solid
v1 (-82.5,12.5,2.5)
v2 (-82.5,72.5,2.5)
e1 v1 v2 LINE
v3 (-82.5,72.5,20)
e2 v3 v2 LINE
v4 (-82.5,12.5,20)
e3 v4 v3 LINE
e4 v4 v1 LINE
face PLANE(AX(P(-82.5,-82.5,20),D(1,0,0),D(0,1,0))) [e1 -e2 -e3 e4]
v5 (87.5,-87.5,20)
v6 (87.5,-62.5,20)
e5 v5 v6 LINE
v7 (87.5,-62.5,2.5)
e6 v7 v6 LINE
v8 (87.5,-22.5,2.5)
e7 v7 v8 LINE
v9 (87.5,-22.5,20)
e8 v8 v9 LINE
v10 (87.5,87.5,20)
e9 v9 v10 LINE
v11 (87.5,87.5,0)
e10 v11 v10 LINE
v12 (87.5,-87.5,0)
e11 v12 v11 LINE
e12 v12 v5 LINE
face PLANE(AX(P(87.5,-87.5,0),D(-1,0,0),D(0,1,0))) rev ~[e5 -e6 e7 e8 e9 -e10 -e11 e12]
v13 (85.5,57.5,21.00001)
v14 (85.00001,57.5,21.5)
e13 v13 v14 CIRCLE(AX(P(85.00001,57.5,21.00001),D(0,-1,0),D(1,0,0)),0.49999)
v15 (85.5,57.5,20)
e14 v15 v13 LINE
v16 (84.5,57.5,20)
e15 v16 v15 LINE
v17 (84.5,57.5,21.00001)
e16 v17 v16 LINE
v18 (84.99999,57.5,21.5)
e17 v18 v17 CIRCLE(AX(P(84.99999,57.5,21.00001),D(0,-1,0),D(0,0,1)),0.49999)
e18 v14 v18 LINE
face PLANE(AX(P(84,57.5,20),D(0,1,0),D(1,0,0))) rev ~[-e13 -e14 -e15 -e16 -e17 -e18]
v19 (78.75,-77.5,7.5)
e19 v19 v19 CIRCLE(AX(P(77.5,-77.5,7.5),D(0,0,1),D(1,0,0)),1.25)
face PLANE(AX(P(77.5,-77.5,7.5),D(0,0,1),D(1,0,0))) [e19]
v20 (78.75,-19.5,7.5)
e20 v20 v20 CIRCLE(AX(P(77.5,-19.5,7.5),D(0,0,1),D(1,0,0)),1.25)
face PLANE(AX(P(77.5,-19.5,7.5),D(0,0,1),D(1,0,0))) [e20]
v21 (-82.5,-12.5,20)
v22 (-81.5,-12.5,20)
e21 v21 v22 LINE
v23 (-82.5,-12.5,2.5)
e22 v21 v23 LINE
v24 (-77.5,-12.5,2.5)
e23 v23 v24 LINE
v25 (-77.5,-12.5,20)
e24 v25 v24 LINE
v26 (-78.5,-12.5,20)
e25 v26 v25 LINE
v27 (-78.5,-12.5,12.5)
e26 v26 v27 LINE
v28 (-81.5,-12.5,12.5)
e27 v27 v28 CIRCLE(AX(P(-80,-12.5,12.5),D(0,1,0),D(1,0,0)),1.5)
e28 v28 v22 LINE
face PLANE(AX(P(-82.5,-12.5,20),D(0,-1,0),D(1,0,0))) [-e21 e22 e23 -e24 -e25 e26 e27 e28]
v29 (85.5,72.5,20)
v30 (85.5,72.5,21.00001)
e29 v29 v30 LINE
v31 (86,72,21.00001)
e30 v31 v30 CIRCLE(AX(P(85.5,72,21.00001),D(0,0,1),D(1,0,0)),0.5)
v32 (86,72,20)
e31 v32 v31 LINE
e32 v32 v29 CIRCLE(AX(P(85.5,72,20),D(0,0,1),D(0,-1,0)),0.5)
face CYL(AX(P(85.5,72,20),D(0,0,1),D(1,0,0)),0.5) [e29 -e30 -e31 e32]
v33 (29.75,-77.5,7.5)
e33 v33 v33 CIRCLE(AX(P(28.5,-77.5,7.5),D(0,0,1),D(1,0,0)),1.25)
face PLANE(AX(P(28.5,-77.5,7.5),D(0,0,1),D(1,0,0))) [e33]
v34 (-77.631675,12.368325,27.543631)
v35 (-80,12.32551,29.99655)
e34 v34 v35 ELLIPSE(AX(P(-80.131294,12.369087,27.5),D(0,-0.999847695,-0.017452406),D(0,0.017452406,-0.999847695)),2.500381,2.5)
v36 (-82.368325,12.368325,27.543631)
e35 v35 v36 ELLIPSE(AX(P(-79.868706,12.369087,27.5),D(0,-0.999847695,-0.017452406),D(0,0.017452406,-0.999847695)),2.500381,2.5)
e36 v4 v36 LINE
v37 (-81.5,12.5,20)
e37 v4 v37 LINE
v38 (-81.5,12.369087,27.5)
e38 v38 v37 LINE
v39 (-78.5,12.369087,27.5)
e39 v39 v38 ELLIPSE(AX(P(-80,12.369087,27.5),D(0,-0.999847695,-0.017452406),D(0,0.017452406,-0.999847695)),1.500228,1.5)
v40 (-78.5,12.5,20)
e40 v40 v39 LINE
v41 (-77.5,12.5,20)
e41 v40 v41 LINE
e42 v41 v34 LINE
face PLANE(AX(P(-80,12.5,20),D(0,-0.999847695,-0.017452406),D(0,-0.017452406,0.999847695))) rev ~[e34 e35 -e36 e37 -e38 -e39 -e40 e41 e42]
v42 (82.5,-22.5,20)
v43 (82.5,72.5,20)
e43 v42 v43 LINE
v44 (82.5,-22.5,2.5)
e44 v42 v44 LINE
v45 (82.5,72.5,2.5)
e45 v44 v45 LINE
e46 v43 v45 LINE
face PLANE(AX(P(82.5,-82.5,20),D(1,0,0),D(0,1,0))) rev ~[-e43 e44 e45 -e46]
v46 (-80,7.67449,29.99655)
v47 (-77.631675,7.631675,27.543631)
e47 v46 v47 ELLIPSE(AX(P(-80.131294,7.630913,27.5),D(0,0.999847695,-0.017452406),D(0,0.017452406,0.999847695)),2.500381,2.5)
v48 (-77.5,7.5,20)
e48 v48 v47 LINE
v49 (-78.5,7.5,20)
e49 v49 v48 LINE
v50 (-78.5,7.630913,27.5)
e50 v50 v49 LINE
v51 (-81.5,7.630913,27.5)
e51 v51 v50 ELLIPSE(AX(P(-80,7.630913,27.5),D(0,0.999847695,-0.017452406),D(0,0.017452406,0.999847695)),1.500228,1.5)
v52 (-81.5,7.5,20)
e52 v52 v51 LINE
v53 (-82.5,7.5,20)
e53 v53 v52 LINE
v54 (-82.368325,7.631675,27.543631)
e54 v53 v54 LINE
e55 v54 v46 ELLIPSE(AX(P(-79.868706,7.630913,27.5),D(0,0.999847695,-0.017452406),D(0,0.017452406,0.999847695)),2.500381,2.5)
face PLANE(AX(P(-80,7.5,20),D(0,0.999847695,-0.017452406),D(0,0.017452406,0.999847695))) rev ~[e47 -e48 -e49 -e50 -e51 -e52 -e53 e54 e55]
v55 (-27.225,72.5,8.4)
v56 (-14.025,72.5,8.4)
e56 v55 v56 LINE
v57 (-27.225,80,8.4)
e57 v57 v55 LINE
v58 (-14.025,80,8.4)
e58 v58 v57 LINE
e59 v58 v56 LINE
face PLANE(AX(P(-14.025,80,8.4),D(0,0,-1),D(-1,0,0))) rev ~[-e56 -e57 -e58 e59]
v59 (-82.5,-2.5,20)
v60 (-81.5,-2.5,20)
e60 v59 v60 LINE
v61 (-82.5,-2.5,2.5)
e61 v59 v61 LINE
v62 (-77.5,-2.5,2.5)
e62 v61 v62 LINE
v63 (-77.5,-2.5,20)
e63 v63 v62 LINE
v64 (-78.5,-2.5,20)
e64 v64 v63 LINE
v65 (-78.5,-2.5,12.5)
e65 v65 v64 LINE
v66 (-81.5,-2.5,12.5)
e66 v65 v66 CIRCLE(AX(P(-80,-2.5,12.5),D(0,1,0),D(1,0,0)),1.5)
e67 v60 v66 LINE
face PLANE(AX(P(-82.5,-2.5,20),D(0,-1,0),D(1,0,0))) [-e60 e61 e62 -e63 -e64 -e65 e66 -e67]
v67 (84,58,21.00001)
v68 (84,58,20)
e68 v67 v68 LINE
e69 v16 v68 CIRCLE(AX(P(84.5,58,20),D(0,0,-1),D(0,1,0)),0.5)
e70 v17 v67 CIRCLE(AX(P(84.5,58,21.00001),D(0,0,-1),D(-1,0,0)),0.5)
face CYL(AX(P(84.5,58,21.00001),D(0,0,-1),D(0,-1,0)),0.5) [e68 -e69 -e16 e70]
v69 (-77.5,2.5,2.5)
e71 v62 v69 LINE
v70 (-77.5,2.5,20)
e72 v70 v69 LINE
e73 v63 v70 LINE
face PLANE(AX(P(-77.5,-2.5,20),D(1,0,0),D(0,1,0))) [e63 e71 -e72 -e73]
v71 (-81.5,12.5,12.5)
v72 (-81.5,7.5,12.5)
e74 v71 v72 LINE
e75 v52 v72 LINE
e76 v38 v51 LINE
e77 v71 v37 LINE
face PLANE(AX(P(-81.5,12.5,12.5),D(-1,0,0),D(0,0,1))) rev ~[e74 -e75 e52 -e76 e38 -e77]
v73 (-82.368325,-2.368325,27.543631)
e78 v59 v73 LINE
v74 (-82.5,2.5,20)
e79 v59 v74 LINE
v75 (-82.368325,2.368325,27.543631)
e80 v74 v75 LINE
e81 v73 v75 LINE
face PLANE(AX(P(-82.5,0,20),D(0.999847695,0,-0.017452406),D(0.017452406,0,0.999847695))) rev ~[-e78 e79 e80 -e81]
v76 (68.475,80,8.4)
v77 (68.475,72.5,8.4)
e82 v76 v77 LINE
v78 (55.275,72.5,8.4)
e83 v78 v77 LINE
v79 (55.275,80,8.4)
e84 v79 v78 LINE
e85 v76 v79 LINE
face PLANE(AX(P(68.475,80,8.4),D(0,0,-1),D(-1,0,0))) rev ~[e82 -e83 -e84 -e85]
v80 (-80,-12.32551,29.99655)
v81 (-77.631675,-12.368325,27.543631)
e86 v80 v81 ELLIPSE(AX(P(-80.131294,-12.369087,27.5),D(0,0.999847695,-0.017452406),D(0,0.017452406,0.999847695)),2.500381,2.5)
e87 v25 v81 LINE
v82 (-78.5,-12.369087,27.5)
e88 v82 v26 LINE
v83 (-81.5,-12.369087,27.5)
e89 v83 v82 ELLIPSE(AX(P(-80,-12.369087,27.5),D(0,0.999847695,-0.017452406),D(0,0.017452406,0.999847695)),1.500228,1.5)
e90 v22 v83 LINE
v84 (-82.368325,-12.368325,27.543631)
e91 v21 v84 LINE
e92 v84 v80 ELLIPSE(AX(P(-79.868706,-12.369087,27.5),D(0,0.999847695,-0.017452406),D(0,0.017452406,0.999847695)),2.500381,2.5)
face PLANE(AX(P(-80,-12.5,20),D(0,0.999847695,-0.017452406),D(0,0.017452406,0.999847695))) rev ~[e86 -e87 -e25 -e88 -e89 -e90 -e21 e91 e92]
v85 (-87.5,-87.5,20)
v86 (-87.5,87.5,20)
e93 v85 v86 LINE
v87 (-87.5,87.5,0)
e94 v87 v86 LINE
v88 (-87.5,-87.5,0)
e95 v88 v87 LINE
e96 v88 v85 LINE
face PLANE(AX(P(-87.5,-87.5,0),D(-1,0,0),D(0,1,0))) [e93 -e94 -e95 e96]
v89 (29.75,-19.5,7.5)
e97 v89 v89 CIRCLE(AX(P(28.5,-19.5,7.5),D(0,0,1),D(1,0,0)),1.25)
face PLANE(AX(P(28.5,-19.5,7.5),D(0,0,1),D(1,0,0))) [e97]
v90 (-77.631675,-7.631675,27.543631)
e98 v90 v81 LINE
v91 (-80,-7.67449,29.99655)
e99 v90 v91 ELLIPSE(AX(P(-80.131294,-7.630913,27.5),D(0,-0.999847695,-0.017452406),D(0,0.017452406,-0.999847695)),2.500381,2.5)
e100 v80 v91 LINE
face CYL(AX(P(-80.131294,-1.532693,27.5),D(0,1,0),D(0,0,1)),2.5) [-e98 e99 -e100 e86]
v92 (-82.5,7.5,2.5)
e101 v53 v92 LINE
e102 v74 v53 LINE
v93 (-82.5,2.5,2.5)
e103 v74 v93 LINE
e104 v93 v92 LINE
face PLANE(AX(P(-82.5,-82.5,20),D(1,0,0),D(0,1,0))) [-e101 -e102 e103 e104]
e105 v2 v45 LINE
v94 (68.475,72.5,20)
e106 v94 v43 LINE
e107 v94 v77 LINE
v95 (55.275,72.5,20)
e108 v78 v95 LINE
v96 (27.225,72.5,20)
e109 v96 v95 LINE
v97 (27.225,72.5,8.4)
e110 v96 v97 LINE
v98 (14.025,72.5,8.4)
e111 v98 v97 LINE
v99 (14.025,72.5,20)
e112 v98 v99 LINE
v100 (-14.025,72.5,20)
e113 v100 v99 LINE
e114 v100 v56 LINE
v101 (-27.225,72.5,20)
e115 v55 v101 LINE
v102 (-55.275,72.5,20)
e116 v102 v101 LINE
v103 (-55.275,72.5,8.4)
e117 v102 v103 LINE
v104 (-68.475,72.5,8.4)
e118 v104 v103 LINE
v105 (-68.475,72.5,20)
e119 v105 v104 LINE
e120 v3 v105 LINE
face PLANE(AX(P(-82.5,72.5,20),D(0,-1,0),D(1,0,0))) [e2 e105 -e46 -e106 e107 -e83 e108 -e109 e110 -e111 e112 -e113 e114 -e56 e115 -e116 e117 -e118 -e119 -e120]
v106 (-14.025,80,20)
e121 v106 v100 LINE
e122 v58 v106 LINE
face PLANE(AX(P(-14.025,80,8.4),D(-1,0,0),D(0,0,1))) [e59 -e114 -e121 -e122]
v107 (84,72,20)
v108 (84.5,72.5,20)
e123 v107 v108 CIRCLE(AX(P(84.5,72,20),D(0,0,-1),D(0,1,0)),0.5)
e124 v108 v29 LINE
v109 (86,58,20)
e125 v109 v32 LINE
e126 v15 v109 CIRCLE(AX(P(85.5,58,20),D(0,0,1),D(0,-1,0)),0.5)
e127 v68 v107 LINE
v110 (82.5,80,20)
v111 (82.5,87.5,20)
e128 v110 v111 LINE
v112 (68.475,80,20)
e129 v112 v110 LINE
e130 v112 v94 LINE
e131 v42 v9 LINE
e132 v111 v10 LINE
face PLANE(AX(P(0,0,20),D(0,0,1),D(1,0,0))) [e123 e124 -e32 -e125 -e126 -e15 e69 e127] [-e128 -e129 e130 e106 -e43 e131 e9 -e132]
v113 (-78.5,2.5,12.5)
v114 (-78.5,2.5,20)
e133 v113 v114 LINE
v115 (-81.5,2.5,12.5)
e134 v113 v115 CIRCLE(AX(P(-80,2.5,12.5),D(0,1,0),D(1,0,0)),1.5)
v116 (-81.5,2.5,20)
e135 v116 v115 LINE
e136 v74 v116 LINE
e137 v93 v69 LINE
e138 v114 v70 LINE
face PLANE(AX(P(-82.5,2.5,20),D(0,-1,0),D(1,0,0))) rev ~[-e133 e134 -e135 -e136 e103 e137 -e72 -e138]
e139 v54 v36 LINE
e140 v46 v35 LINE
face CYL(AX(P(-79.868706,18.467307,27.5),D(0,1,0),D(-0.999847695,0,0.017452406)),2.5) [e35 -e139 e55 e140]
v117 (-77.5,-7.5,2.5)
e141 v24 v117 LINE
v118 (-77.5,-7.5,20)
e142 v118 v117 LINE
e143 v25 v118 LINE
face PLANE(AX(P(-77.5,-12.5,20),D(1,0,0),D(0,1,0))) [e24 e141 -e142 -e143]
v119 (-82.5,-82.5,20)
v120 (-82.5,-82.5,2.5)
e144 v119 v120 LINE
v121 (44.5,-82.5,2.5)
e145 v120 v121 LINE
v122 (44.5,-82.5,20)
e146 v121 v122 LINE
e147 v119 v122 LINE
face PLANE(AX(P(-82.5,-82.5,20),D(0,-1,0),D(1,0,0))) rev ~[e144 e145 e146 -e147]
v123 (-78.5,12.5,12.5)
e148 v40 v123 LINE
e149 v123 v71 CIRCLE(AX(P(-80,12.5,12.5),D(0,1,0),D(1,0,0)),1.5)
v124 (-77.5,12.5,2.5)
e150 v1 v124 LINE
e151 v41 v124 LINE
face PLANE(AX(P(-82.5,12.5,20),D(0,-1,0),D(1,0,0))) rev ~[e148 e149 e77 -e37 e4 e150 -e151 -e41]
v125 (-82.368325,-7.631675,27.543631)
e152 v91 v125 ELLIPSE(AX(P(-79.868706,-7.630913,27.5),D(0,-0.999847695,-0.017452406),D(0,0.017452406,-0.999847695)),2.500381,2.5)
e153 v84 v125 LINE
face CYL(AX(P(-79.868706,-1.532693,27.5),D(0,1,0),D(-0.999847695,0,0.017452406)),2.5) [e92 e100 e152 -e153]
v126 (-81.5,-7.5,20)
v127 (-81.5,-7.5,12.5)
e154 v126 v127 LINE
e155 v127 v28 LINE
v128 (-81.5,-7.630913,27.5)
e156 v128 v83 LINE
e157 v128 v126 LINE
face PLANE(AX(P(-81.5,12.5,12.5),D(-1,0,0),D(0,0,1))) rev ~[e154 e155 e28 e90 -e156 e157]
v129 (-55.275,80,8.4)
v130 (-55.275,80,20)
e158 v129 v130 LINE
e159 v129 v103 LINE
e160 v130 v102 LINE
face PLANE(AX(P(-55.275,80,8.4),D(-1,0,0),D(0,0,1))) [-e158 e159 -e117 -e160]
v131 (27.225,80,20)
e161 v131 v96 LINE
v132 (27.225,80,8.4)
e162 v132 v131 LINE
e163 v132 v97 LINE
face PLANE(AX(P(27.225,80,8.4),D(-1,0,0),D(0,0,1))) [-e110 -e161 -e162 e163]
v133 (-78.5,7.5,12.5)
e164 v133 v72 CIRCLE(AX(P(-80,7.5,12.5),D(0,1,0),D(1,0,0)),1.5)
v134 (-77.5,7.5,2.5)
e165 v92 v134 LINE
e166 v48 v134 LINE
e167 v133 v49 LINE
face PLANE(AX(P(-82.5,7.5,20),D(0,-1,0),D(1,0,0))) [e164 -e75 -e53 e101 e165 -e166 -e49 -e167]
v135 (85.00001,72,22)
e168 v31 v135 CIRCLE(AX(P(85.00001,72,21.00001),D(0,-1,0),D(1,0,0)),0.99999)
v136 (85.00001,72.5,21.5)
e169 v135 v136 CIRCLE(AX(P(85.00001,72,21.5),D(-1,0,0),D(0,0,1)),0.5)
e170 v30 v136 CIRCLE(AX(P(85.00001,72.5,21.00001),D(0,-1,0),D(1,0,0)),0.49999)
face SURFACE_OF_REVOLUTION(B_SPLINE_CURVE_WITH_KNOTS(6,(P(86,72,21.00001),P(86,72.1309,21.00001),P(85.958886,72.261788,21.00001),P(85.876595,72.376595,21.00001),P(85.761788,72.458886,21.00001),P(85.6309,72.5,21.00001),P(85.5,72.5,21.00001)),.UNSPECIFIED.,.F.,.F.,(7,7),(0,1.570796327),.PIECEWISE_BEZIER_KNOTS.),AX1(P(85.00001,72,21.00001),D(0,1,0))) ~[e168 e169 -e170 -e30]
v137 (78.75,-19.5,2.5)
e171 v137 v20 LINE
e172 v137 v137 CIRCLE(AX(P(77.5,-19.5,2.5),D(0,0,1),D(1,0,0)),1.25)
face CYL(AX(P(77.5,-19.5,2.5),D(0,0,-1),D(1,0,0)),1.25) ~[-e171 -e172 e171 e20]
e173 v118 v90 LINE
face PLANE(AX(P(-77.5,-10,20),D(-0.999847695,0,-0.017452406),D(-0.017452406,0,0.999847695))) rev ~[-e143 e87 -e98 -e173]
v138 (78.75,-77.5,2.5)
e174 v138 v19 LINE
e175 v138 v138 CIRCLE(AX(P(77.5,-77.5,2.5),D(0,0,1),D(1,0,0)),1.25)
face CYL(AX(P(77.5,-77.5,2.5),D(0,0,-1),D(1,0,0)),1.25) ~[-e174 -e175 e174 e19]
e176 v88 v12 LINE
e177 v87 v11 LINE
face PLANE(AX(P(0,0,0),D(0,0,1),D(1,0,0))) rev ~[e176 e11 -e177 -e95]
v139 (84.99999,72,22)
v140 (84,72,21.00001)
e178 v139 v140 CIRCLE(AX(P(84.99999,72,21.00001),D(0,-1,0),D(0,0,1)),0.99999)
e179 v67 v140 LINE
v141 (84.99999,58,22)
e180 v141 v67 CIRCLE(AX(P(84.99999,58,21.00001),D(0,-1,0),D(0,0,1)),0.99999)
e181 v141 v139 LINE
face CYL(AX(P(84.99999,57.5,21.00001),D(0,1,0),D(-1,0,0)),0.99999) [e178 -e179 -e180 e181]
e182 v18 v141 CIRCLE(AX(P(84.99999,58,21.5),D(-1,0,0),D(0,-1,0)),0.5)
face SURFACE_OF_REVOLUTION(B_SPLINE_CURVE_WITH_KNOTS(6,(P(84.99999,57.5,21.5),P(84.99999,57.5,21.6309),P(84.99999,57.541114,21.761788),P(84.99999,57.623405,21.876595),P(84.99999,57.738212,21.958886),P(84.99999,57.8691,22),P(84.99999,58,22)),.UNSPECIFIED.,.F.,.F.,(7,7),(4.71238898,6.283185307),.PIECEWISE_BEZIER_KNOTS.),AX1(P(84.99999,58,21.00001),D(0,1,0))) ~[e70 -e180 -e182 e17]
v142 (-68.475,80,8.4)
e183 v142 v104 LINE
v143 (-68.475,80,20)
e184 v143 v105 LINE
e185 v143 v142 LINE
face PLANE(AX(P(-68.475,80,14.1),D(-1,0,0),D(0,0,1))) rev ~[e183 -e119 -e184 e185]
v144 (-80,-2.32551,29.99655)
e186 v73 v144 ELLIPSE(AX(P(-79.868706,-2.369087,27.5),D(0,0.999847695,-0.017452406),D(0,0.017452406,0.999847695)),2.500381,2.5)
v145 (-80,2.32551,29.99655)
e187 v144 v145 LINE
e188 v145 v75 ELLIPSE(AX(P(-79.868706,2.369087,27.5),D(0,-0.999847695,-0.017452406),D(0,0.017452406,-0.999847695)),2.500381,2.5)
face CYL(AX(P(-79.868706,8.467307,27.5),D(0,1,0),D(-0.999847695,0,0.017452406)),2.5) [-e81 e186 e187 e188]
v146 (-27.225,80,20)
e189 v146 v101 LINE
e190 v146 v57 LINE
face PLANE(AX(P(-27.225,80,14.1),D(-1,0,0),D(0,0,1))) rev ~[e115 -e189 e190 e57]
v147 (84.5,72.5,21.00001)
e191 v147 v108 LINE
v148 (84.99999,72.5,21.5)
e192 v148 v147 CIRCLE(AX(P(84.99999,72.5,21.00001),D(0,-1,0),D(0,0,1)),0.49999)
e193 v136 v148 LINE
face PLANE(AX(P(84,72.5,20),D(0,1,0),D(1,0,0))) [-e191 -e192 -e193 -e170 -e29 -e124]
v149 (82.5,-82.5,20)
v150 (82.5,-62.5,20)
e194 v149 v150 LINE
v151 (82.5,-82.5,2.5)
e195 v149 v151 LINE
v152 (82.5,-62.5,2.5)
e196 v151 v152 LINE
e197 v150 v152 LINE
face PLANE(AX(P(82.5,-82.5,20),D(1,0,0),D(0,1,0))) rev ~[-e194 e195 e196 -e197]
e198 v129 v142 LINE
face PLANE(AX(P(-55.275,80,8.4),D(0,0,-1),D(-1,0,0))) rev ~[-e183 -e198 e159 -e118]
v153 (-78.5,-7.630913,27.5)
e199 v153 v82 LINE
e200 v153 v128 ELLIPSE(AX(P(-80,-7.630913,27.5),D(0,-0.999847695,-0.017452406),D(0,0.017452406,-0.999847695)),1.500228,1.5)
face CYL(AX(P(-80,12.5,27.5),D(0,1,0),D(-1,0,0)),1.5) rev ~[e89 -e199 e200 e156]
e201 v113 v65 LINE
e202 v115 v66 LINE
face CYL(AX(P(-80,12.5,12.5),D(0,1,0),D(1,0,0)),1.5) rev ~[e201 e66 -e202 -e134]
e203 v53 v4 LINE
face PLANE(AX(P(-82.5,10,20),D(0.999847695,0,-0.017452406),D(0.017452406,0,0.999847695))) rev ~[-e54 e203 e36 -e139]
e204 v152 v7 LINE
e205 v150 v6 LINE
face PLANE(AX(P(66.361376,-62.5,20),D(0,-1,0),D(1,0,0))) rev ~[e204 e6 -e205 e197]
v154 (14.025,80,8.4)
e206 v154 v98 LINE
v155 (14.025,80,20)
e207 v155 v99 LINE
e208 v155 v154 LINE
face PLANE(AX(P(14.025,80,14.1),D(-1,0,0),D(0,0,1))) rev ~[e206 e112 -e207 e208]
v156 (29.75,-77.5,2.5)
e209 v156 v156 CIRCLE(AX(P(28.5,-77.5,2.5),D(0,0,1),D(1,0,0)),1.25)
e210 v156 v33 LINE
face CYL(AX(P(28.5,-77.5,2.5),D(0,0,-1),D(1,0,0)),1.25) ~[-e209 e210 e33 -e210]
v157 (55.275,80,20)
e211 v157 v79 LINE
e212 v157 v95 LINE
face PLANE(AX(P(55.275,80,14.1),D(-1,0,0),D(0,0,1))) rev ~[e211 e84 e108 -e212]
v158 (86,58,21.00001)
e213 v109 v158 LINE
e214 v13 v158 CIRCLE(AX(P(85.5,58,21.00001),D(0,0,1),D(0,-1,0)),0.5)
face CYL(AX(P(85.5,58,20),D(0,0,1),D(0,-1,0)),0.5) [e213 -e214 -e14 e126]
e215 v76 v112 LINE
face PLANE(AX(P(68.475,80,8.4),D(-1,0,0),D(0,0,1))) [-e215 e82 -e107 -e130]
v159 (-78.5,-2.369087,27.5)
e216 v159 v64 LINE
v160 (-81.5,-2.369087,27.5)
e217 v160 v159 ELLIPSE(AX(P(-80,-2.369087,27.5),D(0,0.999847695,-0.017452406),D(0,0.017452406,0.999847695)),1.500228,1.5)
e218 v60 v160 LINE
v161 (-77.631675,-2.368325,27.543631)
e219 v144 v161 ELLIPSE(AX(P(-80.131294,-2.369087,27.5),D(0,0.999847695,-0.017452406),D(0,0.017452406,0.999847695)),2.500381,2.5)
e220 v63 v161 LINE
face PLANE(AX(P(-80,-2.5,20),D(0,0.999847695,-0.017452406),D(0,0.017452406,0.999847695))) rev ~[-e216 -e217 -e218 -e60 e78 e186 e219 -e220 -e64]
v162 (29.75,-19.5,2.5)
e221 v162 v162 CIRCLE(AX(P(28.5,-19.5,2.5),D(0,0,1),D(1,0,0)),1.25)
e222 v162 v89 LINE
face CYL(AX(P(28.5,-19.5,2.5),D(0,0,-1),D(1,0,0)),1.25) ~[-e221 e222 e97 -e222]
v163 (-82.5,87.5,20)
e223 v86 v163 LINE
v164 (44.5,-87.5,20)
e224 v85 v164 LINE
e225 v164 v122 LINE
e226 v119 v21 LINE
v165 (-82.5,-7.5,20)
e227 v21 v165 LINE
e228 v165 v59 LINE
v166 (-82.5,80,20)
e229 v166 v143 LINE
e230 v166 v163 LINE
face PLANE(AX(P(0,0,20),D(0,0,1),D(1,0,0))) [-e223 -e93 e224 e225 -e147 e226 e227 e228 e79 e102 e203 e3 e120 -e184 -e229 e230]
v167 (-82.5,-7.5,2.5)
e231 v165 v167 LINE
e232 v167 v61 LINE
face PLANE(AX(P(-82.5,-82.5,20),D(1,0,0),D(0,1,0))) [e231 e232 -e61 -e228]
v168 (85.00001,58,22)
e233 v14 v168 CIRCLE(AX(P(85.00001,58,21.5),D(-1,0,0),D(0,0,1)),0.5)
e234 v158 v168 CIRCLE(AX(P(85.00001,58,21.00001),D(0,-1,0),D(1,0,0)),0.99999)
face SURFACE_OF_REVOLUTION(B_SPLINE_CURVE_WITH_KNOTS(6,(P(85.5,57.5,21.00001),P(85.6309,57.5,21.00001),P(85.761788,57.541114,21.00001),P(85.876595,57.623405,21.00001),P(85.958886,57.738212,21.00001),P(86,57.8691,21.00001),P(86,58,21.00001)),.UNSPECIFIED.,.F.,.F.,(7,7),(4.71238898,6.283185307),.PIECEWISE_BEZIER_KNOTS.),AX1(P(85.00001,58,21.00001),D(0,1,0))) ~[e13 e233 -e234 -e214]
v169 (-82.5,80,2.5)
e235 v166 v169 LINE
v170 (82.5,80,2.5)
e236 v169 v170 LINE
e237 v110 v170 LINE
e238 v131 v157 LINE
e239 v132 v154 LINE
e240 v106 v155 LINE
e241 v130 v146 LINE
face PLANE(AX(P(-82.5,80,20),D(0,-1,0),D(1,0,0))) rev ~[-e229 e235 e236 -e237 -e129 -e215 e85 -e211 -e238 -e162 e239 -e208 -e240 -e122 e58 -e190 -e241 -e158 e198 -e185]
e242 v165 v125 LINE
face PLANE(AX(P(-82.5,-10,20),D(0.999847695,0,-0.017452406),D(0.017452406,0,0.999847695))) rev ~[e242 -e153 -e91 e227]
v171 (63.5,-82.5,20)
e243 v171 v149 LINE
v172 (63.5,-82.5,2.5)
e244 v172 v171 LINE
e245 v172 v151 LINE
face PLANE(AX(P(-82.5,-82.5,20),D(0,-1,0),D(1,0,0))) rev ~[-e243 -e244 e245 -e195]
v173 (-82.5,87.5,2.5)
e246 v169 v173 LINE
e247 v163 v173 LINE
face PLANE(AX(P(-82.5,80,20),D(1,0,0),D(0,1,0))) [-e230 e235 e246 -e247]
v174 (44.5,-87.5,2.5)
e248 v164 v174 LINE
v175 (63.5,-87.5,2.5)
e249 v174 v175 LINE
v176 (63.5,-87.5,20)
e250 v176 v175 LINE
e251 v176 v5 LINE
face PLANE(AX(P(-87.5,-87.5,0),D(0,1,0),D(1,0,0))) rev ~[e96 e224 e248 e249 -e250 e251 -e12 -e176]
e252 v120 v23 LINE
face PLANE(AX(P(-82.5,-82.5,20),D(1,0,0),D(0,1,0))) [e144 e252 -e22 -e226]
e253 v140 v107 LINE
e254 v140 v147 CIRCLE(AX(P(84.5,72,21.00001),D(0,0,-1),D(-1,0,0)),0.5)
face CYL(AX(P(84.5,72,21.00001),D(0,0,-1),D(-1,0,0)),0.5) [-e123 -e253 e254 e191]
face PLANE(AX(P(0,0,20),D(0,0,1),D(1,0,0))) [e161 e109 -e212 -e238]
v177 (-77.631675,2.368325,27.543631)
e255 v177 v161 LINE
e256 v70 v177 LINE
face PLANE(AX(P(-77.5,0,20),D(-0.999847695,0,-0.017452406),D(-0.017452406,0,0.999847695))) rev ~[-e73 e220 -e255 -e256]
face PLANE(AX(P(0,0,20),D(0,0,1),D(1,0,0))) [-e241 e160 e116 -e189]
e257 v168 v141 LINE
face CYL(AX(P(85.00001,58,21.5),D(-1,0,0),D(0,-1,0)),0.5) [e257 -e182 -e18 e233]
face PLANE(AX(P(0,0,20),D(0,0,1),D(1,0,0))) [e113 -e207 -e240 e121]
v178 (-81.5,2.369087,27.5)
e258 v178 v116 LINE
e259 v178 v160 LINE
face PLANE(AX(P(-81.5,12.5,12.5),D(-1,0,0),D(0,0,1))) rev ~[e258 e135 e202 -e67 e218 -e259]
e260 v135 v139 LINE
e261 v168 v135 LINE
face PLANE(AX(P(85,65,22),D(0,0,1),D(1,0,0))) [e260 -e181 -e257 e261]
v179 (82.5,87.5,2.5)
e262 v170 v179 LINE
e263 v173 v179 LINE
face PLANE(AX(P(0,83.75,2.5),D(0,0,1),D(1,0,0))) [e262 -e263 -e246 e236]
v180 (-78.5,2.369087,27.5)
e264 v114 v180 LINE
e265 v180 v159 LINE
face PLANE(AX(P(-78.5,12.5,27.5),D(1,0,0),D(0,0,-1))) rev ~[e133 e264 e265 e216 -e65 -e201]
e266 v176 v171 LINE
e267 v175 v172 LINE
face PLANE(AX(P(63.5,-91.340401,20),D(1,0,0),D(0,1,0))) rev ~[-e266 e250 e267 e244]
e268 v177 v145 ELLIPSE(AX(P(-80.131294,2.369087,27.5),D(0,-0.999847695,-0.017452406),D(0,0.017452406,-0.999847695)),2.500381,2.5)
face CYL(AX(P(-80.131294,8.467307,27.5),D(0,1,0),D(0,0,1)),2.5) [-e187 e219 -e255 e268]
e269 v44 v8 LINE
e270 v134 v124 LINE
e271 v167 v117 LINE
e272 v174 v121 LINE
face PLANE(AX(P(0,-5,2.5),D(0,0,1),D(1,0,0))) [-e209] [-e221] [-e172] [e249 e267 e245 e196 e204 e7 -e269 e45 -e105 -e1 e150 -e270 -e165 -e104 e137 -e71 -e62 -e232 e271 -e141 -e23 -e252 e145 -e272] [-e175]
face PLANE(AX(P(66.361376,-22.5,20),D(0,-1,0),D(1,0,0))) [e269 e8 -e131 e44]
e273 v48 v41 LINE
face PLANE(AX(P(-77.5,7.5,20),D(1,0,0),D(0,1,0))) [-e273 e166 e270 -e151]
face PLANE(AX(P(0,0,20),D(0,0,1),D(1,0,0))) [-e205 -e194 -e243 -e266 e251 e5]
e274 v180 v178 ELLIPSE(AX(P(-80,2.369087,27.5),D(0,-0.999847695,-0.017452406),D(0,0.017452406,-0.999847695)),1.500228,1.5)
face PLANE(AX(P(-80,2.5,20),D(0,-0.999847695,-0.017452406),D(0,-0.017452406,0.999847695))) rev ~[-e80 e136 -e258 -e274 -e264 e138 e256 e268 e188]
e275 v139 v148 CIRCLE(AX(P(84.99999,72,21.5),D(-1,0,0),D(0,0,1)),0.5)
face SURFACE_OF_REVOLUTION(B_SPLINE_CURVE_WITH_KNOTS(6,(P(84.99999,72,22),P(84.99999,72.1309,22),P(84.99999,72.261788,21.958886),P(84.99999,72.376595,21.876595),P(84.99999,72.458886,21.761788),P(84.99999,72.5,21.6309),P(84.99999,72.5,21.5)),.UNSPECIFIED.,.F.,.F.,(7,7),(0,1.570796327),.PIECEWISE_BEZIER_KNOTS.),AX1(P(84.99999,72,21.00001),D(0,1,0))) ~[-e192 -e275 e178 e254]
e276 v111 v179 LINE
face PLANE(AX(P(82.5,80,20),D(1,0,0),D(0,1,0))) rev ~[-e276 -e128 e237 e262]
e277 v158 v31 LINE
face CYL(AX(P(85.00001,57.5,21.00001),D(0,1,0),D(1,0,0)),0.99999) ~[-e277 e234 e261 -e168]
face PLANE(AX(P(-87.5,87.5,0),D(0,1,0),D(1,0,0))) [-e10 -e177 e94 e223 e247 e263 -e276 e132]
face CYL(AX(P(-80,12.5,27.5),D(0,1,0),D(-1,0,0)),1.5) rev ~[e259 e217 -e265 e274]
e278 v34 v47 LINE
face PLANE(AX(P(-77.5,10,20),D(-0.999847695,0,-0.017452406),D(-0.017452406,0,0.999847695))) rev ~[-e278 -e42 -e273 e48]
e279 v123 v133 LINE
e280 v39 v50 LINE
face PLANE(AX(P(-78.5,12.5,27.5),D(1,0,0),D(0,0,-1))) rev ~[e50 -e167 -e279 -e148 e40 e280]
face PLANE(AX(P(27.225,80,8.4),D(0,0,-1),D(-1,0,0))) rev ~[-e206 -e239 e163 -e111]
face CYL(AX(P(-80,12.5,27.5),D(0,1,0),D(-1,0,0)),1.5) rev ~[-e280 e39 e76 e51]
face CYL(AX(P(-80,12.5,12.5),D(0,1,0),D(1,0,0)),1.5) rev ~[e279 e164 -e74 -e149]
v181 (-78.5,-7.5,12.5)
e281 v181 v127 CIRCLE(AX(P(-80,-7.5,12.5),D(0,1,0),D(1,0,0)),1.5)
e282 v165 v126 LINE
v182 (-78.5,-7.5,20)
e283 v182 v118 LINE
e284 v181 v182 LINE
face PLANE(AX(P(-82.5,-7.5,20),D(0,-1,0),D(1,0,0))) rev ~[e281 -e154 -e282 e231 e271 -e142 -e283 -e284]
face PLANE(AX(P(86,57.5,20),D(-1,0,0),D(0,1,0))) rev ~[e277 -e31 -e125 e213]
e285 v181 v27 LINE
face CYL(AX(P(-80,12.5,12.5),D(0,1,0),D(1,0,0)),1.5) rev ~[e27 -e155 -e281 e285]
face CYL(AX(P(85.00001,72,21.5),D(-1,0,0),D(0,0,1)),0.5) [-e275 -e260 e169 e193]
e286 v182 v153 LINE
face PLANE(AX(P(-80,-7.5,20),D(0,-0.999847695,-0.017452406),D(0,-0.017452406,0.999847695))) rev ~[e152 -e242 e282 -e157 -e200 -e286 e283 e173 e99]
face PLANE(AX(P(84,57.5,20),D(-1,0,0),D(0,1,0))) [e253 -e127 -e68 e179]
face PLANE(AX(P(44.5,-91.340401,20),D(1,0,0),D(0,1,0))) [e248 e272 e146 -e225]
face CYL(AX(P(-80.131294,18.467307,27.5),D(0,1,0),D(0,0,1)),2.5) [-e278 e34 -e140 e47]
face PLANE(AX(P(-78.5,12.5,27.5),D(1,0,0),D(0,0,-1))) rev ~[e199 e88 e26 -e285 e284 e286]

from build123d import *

# Parameters (mm, degrees)
F0_W           = 175
F0_H           = 175
F1_DEPTH       = 20
F2_W           = 165
F2_H           = 155
F3_DEPTH       = 17.5
F4_R           = 1.25
F5_DEPTH       = 5
F6_W           = 165
F6_H           = 7.5
F7_DEPTH       = 17.5
F8_W           = 13.2
F8_H           = 5.7
F9_DEPTH       = 8.5
F10_W          = 5
F10_H          = 5
F11_DEPTH      = 17.5
F11_DEPTH_BACK = 10
F11_TAPER_BACK = 1
F12_T1_DEPTH   = 16.9346144904
F12_T3_DEPTH   = 16.9346144904
F12_T5_DEPTH   = 16.9346144904
F14_DEPTH      = 25
F15_W          = 19
F15_H          = 17.6808023453
F15_W_2        = 32.2772479057
F15_H_2        = 40
F16_DEPTH      = 17.5
F17_W          = 13.2
F17_H          = 5.9
F18_DEPTH      = 8.5
F19_W          = 2
F19_H          = 15
F20_DEPTH      = 2
F21_R          = 0.99999
F22_R          = 0.5


# Not quite as in the source:
# - a fillet or chamfer that OpenCascade refuses, or shapes differently, is made with other operations: its cross-section is extruded or revolved along the edge and cut away or added
# - a fillet or chamfer is up to 0.001 mm smaller than in the source, because OpenCascade refuses the exact size


with BuildPart() as f1:
    # F0 (on Top) → F1 (new body)
    with BuildSketch(Plane.XY):
        Rectangle(F0_W, F0_H)
    extrude(amount=F1_DEPTH)

    # F2 (on face) → F3 (cut)
    with BuildSketch(Plane.XY.offset(20)):
        with Locations((0, -5)):
            Rectangle(F2_W, F2_H)
    extrude(amount=-F3_DEPTH, mode=Mode.SUBTRACT)

    # F4 (on face) → F5 (join)
    with BuildSketch(Plane.XY.offset(2.5)):
        with Locations((28.5, -77.5)):
            Circle(F4_R)
        with Locations((28.5, -19.5)):
            Circle(F4_R)
        with Locations((77.5, -77.5)):
            Circle(F4_R)
        with Locations((77.5, -19.5)):
            Circle(F4_R)
    extrude(amount=F5_DEPTH)

    # F6 (on face) → F7 (cut)
    with BuildSketch(Plane.XY.offset(20)):
        with Locations((0, 83.75)):
            Rectangle(F6_W, F6_H)
    extrude(amount=-F7_DEPTH, mode=Mode.SUBTRACT)

    # F8 (on face) → F9 (cut)
    with BuildSketch(Plane(origin=(0, 80, 0), x_dir=(-1, 0, 0), z_dir=(0, 1, 0))):
        with Locations((-61.875, 11.25)):
            Rectangle(F8_W, F8_H)
        with Locations((-20.625, 11.25)):
            Rectangle(F8_W, F8_H)
        with Locations((20.625, 11.25)):
            Rectangle(F8_W, F8_H)
        with Locations((61.875, 11.25)):
            Rectangle(F8_W, F8_H)
    extrude(amount=-F9_DEPTH, mode=Mode.SUBTRACT)

    # F10 (on face) → F11 (join, two sides)
    with BuildSketch(Plane.XY.offset(20)) as f11_sk:
        with Locations((-80, 0)):
            Rectangle(F10_W, F10_H)
        with Locations((-80, 10)):
            Rectangle(F10_W, F10_H)
        with Locations((-80, -10)):
            Rectangle(F10_W, F10_H)
    extrude(amount=-F11_DEPTH)
    extrude(f11_sk.sketch, amount=F11_DEPTH_BACK, taper=F11_TAPER_BACK)

    # F12: fillet of radius 2.5 on 6 edges, made by hand

    # F12_s2 → F12_t1 (cut)
    with BuildSketch(Plane.XZ.offset(-18.4673072452)):
        with BuildLine():
            ThreePointArc((-82.3683254308, 27.5436310161), (-81.6209793537, 29.2831261229), (-79.8687061929, 30))
            Line((-79.8687061929, 30), (-82.3254493507, 30))
            Line((-82.3254493507, 30), (-82.3683254308, 27.5436310161))
        make_face()
        with BuildLine():
            ThreePointArc((-80.1312938071, 30), (-78.3790206463, 29.2831261229), (-77.6316745692, 27.5436310161))
            Line((-77.6316745692, 27.5436310161), (-77.6745506493, 30))
            Line((-77.6745506493, 30), (-80.1312938071, 30))
        make_face()
    extrude(amount=F12_T1_DEPTH, mode=Mode.SUBTRACT)

    # F12_s4 → F12_t3 (cut)
    with BuildSketch(Plane.XZ.offset(-8.4673072452)):
        with BuildLine():
            ThreePointArc((-82.3683254308, 27.5436310161), (-81.6209793537, 29.2831261229), (-79.8687061929, 30))
            Line((-79.8687061929, 30), (-82.3254493507, 30))
            Line((-82.3254493507, 30), (-82.3683254308, 27.5436310161))
        make_face()
        with BuildLine():
            ThreePointArc((-80.1312938071, 30), (-78.3790206463, 29.2831261229), (-77.6316745692, 27.5436310161))
            Line((-77.6316745692, 27.5436310161), (-77.6745506493, 30))
            Line((-77.6745506493, 30), (-80.1312938071, 30))
        make_face()
    extrude(amount=F12_T3_DEPTH, mode=Mode.SUBTRACT)

    # F12_s6 → F12_t5 (cut)
    with BuildSketch(Plane.XZ.offset(1.5326927548)):
        with BuildLine():
            ThreePointArc((-82.3683254308, 27.5436310161), (-81.6209793537, 29.2831261229), (-79.8687061929, 30))
            Line((-79.8687061929, 30), (-82.3254493507, 30))
            Line((-82.3254493507, 30), (-82.3683254308, 27.5436310161))
        make_face()
        with BuildLine():
            ThreePointArc((-80.1312938071, 30), (-78.3790206463, 29.2831261229), (-77.6316745692, 27.5436310161))
            Line((-77.6316745692, 27.5436310161), (-77.6745506493, 30))
            Line((-77.6745506493, 30), (-80.1312938071, 30))
        make_face()
    extrude(amount=F12_T5_DEPTH, mode=Mode.SUBTRACT)

    # F13 (on face) → F14 (cut)
    with BuildSketch(Plane(origin=(0, 12.5, 0), x_dir=(-1, 0, 0), z_dir=(0, 1, 0))):
        with BuildLine():
            Line((81.5, 12.5), (81.5, 27.5))
            ThreePointArc((81.5, 27.5), (80, 29), (78.5, 27.5))
            Line((78.5, 27.5), (78.5, 12.5))
            ThreePointArc((78.5, 12.5), (80, 11), (81.5, 12.5))
        make_face()
    extrude(amount=-F14_DEPTH, mode=Mode.SUBTRACT)

    # F15 (on face) → F16 (cut)
    with BuildSketch(Plane.XY.offset(20)):
        with Locations((54, -82.5)):
            Rectangle(F15_W, F15_H)
        with Locations((82.5, -42.5)):
            Rectangle(F15_W_2, F15_H_2)
    extrude(amount=-F16_DEPTH, mode=Mode.SUBTRACT)

    # F17 (on face) → F18 (cut)
    with BuildSketch(Plane(origin=(0, 80, 0), x_dir=(-1, 0, 0), z_dir=(0, 1, 0))):
        with Locations((-61.875, 17.05)):
            Rectangle(F17_W, F17_H)
        with Locations((-20.625, 17.05)):
            Rectangle(F17_W, F17_H)
        with Locations((20.625, 17.05)):
            Rectangle(F17_W, F17_H)
        with Locations((61.875, 17.05)):
            Rectangle(F17_W, F17_H)
    extrude(amount=-F18_DEPTH, mode=Mode.SUBTRACT)

    # F19 (on face) → F20 (join)
    with BuildSketch(Plane.XY.offset(20)):
        with Locations((85, 65)):
            Rectangle(F19_W, F19_H)
    extrude(amount=F20_DEPTH)

    # F21 (radius 1 in the source; OpenCascade refuses exactly that, so slightly less here)
    f21_edges = [f1.edges().sort_by_distance(p)[0] for p in [
        (84, 65, 22),
        (86, 65, 22),
    ]]
    fillet(f21_edges, radius=F21_R)

    # F22
    f22_edges = [f1.edges().sort_by_distance(p)[0] for p in [
        (85.70711, 57.5, 21.70711),
        (85.70711, 72.5, 21.70711),
        (86, 57.5, 20.500005),
        (86, 72.5, 20.500005),
        (84, 57.5, 20.500005),
        (84.29289, 57.5, 21.70711),
        (85, 57.5, 22),
        (85, 72.5, 22),
        (84, 72.5, 20.500005),
        (84.29289, 72.5, 21.70711),
    ]]
    fillet(f22_edges, radius=F22_R)


solid = f1.part
